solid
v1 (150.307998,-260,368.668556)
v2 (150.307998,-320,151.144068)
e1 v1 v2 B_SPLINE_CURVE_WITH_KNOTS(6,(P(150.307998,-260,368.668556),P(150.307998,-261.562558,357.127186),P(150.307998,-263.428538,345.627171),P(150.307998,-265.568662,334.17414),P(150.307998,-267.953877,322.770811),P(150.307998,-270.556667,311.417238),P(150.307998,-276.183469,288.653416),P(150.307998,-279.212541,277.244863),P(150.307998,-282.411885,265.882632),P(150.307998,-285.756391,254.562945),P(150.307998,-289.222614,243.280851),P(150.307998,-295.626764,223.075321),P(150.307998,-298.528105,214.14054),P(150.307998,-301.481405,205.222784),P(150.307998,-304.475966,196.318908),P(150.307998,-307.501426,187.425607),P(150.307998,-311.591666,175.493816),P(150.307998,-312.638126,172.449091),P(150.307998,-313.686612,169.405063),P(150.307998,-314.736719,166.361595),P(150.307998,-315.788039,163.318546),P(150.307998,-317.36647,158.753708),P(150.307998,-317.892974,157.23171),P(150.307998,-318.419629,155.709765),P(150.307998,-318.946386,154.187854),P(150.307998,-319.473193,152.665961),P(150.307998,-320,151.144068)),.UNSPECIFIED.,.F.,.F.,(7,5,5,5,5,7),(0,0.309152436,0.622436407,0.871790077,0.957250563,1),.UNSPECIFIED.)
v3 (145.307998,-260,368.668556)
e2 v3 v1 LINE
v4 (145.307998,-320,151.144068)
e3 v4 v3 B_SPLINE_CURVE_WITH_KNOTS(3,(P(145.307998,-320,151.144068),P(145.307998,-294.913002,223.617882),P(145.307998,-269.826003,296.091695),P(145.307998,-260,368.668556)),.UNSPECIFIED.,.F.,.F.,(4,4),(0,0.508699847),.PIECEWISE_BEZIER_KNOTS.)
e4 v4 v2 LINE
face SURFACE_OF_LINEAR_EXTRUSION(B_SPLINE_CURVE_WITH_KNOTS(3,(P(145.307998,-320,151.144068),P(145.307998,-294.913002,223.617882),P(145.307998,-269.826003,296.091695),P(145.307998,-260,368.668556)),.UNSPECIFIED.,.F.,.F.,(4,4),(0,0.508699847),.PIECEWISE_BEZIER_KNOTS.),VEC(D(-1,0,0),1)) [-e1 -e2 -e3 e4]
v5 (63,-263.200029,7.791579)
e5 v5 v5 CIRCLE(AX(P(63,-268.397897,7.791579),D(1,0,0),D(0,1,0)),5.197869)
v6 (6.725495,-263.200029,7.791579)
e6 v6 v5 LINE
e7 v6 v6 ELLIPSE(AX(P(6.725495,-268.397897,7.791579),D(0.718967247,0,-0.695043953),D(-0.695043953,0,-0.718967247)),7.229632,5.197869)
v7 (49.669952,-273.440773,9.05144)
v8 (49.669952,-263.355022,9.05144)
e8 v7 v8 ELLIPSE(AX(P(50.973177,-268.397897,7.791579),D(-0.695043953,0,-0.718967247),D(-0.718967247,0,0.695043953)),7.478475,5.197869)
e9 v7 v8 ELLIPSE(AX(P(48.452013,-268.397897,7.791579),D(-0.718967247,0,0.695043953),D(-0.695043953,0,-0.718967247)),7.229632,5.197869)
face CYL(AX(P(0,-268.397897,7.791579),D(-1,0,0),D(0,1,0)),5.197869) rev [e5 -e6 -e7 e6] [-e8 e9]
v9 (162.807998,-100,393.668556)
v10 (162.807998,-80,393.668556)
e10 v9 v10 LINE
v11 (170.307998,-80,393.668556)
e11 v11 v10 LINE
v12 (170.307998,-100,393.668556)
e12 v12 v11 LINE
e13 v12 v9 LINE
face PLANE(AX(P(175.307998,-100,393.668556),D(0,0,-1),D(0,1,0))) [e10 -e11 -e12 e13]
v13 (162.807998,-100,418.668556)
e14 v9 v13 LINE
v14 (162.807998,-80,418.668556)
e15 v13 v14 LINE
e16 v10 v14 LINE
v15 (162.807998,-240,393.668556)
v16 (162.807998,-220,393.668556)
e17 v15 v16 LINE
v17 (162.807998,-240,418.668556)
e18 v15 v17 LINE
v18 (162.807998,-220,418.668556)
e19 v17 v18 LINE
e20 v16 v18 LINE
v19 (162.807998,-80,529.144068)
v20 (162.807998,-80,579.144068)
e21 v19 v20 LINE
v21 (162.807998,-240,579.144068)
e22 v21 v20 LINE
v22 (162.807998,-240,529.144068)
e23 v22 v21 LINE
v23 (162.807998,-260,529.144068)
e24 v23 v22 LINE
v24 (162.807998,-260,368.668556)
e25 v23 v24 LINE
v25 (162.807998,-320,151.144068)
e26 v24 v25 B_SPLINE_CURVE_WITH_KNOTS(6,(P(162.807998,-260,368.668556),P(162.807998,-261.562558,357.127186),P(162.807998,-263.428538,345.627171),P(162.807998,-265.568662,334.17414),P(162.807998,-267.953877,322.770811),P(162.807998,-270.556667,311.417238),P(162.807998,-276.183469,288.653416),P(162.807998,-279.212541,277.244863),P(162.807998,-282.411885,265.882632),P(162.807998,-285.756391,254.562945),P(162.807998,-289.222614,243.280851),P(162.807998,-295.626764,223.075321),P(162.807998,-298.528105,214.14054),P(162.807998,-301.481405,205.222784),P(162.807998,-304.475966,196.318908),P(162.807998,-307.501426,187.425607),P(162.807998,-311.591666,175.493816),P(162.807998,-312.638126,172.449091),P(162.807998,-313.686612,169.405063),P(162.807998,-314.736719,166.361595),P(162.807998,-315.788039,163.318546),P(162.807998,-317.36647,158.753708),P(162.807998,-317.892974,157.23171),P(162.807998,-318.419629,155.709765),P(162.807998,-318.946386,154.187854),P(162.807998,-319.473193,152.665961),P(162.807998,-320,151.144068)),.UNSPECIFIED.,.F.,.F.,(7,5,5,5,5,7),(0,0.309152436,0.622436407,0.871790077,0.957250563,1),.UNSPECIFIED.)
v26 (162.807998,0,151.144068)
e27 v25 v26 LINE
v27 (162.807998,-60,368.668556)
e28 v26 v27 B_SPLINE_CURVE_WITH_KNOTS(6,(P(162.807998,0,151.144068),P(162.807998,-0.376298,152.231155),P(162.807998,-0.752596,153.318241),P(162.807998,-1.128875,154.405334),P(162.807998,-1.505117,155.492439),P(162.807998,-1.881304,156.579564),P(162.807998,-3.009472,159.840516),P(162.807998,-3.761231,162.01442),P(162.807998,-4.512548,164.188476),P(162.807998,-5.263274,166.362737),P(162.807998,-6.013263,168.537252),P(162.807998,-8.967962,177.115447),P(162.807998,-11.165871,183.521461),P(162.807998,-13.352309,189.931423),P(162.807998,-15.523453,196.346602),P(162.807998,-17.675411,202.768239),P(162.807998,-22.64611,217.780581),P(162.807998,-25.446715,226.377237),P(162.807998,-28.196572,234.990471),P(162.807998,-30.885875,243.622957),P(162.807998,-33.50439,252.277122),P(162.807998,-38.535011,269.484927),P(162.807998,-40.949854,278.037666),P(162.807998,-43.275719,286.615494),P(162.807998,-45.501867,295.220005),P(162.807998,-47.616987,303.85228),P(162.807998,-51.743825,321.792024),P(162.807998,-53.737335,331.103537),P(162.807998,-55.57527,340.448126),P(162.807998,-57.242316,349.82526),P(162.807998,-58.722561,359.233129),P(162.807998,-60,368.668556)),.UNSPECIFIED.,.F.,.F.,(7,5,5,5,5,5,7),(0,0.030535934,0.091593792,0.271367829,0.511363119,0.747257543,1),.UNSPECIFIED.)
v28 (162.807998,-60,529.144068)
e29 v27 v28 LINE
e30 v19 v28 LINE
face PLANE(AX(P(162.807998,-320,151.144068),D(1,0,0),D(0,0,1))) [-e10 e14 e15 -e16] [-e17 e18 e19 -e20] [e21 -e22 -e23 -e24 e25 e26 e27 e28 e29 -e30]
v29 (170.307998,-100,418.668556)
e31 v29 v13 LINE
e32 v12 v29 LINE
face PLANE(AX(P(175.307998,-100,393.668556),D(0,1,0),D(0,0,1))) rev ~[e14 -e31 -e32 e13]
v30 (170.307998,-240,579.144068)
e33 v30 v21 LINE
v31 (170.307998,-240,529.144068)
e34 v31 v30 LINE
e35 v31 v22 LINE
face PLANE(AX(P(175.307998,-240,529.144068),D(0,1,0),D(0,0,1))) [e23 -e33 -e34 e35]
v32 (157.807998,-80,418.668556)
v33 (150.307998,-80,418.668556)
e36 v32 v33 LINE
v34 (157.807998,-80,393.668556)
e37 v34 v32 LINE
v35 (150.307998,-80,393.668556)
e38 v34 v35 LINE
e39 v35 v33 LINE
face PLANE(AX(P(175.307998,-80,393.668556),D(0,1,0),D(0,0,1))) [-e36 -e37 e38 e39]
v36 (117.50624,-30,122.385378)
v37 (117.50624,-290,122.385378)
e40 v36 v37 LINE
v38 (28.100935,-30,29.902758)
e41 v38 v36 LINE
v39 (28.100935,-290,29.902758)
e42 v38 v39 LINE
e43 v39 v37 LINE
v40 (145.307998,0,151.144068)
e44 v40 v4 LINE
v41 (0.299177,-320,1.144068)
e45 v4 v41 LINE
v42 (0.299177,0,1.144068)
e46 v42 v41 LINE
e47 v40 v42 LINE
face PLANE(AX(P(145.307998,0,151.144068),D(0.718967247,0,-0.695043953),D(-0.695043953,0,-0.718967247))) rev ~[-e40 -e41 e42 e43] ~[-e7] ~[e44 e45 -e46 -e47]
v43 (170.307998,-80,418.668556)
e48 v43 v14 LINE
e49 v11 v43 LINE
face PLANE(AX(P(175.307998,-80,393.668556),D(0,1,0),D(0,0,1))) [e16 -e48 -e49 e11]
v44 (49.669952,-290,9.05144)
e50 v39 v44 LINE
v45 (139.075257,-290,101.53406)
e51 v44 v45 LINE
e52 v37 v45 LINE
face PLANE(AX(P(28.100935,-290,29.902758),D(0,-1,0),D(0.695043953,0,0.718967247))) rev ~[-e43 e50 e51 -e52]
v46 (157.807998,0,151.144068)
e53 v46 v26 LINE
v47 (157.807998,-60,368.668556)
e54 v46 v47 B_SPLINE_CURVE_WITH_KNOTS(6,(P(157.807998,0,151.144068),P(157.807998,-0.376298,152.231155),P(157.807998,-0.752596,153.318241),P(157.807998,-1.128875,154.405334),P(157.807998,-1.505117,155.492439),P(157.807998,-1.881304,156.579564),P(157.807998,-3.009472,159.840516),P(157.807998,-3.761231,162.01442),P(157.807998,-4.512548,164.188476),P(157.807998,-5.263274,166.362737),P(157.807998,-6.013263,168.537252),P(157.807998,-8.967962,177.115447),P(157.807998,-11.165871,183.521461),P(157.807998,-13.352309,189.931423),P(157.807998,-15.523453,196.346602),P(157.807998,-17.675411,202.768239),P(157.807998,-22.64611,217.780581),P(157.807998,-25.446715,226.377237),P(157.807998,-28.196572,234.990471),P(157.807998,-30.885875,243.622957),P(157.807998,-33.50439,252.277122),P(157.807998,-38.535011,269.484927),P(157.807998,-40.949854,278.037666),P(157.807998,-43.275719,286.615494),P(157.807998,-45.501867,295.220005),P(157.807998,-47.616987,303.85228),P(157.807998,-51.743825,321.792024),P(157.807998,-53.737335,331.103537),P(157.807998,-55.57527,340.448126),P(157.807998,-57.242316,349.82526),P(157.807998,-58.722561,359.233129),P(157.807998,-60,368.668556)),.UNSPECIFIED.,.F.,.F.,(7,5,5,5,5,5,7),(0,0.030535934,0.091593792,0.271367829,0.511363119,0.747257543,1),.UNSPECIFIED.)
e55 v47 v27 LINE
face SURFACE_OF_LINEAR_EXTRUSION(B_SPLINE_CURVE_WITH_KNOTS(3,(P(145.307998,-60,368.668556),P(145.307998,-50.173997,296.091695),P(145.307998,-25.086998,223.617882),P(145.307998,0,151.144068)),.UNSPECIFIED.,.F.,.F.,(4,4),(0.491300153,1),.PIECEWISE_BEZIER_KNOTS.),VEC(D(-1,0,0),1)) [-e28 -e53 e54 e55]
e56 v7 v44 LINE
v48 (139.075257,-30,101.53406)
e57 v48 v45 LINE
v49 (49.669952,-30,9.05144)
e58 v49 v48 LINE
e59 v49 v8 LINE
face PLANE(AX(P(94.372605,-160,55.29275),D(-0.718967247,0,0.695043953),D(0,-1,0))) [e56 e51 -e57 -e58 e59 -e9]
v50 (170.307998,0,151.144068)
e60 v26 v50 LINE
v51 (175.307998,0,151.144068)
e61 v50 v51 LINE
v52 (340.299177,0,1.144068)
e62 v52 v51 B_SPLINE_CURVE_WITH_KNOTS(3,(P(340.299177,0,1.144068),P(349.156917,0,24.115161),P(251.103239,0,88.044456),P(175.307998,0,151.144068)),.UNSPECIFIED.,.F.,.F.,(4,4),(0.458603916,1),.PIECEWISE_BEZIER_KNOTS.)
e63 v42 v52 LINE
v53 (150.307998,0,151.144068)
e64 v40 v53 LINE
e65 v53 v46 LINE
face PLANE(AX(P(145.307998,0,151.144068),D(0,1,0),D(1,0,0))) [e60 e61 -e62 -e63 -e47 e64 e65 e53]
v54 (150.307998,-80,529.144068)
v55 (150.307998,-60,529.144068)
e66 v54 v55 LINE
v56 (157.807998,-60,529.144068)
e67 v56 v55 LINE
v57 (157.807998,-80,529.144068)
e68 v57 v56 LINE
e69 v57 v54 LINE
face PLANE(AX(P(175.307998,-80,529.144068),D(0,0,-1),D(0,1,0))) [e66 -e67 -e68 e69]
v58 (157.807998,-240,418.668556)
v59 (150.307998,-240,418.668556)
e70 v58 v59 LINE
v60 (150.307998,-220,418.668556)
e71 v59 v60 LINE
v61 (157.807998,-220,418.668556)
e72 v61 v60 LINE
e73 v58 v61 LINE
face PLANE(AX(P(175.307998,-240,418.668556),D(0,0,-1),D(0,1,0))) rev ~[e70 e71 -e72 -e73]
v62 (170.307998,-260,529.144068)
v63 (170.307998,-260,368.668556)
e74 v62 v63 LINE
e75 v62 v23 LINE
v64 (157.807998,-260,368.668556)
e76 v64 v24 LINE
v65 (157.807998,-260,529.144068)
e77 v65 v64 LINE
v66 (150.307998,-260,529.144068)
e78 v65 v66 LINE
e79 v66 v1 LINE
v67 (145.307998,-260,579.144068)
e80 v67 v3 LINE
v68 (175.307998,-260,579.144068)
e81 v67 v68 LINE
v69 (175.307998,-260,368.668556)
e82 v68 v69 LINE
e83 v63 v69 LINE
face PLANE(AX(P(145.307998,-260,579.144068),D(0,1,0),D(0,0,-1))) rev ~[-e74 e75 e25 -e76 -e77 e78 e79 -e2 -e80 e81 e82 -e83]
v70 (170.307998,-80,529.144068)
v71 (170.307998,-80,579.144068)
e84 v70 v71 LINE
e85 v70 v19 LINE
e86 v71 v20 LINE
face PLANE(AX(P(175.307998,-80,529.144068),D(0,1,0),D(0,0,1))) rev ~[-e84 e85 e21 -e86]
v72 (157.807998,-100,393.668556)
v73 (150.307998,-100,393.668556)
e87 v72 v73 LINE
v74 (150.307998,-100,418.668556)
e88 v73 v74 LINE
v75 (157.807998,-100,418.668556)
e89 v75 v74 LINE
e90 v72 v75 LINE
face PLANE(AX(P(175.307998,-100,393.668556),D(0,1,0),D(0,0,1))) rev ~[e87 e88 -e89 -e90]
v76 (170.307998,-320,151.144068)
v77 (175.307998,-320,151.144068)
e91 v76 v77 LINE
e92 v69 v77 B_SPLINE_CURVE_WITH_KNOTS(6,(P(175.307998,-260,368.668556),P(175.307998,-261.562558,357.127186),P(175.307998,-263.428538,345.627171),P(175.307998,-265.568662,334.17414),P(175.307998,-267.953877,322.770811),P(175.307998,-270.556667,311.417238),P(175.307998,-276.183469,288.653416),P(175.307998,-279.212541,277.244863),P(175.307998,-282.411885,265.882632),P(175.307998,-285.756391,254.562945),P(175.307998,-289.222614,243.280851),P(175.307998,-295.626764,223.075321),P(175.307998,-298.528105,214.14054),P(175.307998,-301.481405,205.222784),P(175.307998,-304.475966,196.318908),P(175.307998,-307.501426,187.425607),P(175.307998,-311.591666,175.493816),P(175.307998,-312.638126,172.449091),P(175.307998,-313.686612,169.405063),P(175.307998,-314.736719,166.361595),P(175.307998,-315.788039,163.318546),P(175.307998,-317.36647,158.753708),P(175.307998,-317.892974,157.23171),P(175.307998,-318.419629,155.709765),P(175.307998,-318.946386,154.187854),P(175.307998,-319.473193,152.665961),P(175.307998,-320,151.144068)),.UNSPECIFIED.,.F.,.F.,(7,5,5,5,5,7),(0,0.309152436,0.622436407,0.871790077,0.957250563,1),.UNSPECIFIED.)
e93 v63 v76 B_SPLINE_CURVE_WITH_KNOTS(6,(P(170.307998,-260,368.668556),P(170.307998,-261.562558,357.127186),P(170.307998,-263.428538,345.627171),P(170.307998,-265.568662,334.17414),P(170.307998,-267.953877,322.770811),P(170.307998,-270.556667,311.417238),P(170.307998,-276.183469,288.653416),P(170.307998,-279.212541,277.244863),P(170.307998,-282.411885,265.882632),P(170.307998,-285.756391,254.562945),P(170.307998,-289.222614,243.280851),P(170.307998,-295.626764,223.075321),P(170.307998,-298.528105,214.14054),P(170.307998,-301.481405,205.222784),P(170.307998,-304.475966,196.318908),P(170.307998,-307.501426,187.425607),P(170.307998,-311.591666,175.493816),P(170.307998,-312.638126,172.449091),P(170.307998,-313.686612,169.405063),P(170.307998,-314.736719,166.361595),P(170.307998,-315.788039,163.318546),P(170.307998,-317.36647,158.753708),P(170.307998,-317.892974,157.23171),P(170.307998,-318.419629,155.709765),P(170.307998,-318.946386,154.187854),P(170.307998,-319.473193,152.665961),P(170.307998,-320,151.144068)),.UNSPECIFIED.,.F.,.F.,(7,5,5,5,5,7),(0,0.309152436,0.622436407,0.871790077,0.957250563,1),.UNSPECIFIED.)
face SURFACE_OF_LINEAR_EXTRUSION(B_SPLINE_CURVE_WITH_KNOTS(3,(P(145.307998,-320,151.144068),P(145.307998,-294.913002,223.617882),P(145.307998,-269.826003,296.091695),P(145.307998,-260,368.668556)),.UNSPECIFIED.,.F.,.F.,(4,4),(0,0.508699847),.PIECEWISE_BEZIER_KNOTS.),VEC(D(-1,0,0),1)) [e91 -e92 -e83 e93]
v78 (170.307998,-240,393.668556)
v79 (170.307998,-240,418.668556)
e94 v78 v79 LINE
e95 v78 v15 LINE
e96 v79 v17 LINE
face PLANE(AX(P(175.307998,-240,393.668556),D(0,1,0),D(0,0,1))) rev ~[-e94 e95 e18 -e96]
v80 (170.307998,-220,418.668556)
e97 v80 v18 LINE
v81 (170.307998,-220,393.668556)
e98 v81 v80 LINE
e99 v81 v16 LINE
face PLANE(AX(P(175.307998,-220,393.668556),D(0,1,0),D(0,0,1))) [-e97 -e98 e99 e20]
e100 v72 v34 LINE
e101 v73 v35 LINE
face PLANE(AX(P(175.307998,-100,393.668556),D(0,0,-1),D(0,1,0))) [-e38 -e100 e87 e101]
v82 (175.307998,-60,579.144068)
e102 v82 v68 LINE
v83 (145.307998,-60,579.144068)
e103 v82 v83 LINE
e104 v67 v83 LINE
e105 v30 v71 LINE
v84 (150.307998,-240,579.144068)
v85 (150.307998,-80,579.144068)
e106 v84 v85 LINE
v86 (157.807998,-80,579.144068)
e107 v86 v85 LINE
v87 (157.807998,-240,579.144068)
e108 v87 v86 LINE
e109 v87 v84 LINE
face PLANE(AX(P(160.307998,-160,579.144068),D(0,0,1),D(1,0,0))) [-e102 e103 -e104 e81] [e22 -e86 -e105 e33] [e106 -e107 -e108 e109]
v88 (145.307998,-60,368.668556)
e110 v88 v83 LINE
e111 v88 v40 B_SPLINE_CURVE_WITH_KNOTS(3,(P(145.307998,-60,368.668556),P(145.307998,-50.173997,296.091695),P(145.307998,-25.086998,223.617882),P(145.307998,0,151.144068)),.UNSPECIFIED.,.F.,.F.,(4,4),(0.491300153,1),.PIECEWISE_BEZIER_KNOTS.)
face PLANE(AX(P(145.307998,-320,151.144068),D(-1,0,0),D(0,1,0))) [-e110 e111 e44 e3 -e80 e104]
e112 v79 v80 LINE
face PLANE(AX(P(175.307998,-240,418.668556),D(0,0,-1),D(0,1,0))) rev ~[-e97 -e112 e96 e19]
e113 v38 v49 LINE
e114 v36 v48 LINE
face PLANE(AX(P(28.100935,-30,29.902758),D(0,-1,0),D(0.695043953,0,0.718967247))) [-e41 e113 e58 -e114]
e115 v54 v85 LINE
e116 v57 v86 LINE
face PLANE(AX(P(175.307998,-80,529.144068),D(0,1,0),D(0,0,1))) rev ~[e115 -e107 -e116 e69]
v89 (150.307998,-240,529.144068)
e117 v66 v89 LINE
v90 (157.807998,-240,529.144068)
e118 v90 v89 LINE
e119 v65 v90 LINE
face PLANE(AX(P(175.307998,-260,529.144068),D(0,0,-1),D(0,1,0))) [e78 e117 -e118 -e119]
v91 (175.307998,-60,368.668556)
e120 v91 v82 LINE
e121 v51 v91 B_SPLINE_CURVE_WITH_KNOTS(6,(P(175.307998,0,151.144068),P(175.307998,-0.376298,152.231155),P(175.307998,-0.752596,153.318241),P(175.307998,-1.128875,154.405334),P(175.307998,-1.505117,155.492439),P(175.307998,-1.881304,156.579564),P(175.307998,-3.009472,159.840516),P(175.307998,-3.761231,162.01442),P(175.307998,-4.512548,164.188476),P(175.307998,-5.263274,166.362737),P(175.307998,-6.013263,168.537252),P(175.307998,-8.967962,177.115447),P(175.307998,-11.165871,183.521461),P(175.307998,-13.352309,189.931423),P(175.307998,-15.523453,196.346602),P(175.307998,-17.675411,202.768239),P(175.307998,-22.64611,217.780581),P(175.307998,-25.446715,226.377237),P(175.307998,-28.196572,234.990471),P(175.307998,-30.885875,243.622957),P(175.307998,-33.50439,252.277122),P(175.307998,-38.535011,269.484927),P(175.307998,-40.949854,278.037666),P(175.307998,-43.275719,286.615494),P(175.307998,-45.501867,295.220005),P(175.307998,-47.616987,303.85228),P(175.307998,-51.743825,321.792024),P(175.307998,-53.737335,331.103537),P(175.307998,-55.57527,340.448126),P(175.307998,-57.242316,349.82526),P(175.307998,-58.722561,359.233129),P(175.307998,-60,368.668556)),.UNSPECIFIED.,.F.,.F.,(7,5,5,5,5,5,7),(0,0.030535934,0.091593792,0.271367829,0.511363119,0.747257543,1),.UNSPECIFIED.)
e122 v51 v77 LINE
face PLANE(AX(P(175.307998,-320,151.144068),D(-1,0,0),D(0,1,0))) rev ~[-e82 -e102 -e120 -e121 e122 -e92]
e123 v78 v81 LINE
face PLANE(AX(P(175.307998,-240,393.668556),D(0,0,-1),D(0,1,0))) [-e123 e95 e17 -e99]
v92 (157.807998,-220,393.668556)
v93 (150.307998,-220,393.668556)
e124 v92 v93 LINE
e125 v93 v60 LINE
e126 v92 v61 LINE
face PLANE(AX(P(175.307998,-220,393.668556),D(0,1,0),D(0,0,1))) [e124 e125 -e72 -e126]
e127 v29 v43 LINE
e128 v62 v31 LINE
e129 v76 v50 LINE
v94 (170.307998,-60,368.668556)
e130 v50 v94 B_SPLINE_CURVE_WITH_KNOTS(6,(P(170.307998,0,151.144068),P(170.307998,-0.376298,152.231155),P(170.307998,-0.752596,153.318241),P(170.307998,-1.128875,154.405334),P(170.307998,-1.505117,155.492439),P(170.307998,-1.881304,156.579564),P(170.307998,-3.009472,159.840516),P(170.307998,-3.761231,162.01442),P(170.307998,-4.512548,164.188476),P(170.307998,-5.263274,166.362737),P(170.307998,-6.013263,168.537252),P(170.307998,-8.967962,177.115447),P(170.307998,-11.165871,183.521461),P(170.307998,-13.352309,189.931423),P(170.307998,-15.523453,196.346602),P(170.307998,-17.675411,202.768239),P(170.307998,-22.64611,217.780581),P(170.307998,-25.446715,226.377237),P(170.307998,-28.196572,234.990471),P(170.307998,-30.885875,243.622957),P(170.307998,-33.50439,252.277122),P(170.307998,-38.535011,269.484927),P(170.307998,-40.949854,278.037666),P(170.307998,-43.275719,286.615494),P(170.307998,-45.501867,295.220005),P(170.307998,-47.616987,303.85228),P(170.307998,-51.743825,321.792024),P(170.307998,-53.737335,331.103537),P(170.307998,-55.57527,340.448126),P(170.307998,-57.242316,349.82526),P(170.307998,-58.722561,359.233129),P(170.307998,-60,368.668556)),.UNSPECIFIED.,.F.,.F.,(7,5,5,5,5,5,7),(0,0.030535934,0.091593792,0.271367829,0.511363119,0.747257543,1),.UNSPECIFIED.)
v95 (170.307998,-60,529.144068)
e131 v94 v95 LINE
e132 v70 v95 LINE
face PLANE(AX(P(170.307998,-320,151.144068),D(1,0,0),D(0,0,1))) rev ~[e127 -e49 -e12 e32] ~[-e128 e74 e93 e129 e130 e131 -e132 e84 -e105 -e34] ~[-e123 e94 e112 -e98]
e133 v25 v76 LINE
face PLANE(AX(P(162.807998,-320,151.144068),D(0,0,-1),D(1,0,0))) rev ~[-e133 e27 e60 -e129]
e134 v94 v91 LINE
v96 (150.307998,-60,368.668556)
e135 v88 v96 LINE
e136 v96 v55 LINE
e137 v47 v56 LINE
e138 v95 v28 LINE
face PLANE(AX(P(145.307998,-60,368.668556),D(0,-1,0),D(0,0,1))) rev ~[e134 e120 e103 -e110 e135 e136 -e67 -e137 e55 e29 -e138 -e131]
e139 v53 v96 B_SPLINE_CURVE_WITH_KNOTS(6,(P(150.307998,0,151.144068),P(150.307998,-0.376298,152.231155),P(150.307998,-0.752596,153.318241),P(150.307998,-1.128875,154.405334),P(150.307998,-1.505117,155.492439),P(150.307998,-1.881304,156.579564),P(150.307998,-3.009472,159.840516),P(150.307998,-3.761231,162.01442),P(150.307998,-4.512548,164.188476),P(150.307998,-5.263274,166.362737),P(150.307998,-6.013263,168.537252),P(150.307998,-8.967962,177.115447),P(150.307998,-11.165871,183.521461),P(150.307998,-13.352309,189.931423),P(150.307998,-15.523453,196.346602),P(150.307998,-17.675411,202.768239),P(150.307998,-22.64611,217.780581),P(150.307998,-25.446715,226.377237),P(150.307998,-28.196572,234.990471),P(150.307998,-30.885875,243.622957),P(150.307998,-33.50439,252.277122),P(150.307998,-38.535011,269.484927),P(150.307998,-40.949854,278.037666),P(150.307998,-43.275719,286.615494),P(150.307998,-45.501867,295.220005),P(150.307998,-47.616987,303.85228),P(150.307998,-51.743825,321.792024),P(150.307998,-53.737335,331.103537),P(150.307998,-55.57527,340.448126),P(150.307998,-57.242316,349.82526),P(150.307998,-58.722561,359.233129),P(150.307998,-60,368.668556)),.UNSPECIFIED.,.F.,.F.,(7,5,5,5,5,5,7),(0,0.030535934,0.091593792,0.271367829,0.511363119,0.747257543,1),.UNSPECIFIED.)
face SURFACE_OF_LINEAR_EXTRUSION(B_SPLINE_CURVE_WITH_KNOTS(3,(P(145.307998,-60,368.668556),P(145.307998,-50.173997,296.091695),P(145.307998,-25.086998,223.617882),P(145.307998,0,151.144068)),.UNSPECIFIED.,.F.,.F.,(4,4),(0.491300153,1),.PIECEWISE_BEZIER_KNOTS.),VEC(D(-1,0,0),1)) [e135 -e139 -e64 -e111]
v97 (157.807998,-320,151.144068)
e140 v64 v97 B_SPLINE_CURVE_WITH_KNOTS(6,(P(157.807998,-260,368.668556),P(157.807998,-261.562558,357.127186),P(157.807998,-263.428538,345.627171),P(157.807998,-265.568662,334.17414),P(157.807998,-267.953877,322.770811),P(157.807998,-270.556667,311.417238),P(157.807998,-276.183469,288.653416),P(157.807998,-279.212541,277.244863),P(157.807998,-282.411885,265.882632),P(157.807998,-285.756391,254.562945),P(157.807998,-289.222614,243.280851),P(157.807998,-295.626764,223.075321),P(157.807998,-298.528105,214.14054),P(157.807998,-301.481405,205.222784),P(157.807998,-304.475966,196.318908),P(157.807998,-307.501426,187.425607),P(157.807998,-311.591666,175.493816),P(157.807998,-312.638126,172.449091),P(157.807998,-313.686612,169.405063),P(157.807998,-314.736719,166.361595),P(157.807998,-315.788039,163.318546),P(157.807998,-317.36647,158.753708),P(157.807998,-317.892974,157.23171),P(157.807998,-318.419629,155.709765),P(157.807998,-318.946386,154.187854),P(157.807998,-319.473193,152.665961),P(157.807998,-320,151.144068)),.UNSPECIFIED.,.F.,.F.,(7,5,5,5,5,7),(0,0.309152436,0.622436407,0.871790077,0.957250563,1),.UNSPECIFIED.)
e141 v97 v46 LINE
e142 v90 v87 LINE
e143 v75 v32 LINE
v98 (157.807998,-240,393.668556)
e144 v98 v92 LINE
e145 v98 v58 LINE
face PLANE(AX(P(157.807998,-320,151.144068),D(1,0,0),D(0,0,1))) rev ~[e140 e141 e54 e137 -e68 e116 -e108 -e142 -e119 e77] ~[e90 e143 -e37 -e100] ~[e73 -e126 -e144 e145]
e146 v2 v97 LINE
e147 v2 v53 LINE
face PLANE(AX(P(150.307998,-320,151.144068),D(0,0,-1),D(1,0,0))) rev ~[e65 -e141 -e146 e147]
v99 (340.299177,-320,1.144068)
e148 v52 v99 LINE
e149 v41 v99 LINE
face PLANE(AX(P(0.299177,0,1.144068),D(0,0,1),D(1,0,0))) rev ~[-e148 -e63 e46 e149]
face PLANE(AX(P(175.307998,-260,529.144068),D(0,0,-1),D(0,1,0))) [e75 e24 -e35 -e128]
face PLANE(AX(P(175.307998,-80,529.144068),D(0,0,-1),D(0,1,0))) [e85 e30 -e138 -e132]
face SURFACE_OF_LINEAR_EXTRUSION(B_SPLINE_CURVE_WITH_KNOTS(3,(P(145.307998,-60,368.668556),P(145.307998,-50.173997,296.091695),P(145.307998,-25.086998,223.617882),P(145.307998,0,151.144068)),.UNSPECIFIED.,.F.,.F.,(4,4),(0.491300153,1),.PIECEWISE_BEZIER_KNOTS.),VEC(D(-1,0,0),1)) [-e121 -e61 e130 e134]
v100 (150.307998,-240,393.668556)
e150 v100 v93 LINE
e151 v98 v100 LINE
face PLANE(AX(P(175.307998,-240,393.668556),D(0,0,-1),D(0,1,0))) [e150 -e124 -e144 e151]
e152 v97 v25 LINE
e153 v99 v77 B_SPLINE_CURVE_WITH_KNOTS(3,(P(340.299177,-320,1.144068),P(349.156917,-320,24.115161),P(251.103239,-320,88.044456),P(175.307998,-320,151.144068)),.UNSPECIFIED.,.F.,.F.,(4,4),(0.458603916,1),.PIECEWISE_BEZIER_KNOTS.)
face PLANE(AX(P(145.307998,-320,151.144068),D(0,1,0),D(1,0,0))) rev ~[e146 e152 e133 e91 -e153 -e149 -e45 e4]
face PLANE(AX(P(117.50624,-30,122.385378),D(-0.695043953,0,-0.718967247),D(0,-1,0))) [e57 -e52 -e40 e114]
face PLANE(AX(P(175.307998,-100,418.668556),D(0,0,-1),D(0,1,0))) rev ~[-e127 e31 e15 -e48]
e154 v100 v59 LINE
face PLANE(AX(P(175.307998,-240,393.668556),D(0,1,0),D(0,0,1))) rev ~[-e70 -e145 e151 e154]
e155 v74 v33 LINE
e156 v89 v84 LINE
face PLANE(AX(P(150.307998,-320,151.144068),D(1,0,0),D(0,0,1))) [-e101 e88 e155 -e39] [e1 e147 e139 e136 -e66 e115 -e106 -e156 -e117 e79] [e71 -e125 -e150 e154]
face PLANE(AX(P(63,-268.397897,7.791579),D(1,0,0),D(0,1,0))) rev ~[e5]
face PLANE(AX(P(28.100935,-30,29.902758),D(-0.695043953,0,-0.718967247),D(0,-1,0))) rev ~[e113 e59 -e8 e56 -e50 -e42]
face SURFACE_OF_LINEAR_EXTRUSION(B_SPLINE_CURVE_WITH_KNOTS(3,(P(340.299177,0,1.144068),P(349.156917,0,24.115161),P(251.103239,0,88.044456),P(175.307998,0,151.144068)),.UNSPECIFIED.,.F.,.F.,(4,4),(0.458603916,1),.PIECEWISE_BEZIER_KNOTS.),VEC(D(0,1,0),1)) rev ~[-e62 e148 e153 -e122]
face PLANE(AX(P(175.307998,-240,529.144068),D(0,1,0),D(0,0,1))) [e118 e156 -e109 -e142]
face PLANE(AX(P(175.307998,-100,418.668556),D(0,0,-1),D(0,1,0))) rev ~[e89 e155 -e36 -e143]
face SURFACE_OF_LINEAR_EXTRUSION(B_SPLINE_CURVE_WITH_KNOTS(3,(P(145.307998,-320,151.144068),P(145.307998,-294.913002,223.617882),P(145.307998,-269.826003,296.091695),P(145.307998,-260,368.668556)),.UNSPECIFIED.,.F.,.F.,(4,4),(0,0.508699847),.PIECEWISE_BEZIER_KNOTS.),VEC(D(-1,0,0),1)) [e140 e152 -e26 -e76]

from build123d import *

# Parameters (mm, degrees)
F1_DEPTH  = 320
F2_W      = 30
F2_H      = 320
F3_DEPTH  = 428
F5_DEPTH  = 205
F7_W      = 260
F7_H      = 128.6325914682
F8_DEPTH  = 30
F9_W      = 7.5
F9_H      = 457.219858036
F10_DEPTH = 977
F6_W      = 20
F6_H      = 50
F6_H_2    = 25
F11_DEPTH = 25
F12_R     = 5.1978686685
F13_DEPTH = 63


with BuildPart() as f1:
    # F0 (on Front) → F1 (new body)
    with BuildSketch(Plane.XZ):
        with BuildLine():
            Line((150.299176857, 1.1440683747), (180.299176857, 1.1440683747))
            Line((180.299176857, 1.1440683747), (340.299176857, 1.1440683747))
            add(Edge.make_bspline(
                [(340.299176857, 1.1440683747), (349.1569172885, 24.1151609846), (251.1032390966, 88.0444564268), (175.3079980464, 151.1440683747)],
                knots=[0.4586039165, 0.4586039165, 0.4586039165, 0.4586039165, 1, 1, 1, 1], degree=3))
            Line((175.3079980464, 151.1440683747), (145.3079980464, 151.1440683747))
            Line((145.3079980464, 151.1440683747), (0.299176857, 1.1440683747))
            Line((0.299176857, 1.1440683747), (100.299176857, 1.1440683747))
            Line((100.299176857, 1.1440683747), (150.299176857, 1.1440683747))
        make_face()
    extrude(amount=F1_DEPTH)

    # F2 (on face) → F3 (join)
    with BuildSketch(Plane.XY.offset(151.1440683747)):
        with Locations((160.3079980464, -160)):
            Rectangle(F2_W, F2_H)
    extrude(amount=F3_DEPTH)

    # F4 (on face) → F5 (cut)
    with BuildSketch(Plane(origin=(145.3079980464, 0, 0), x_dir=(0, -1, 0), z_dir=(-1, 0, 0))):
        with BuildLine():
            Line((0, 579.1440683747), (0, 151.1440683747))
            add(Edge.make_bspline(
                [(60, 368.6685562134), (50.1739969339, 296.0916949665), (25.086998467, 223.6178816706), (0, 151.1440683747)],
                knots=[0.4913001533, 0.4913001533, 0.4913001533, 0.4913001533, 1, 1, 1, 1], degree=3))
            Line((60, 368.6685562134), (60, 579.1440683747))
            Line((60, 579.1440683747), (0, 579.1440683747))
        make_face()
        with BuildLine():
            add(Edge.make_bspline(
                [(320, 151.1440683747), (294.913001533, 223.6178816706), (269.8260030661, 296.0916949665), (260, 368.6685562134)],
                knots=[0, 0, 0, 0, 0.5086998467, 0.5086998467, 0.5086998467, 0.5086998467], degree=3))
            Line((320, 151.1440683747), (320, 579.1440683747))
            Line((320, 579.1440683747), (260, 579.1440683747))
            Line((260, 579.1440683747), (260, 368.6685562134))
        make_face()
    extrude(amount=-F5_DEPTH, mode=Mode.SUBTRACT)

    # F7 (on face) → F8 (cut)
    with BuildSketch(Plane(origin=(-0.4170581217, 0, 0.4031807106), x_dir=(0, -1, 0), z_dir=(-0.7189672474, 0, 0.6950439534))):
        with Locations((160, 105.3467844897)):
            Rectangle(F7_W, F7_H)
    extrude(amount=-F8_DEPTH, mode=Mode.SUBTRACT)

    # F9 (on face) → F10 (cut)
    with BuildSketch(Plane.XZ.offset(320)):
        with Locations((154.0579980464, 379.7539973927)):
            Rectangle(F9_W, F9_H)
        with Locations((166.5579980464, 379.7539973927)):
            Rectangle(F9_W, F9_H)
    extrude(amount=-F10_DEPTH, mode=Mode.SUBTRACT)

    # F6 (on face) → F11 (join)
    with BuildSketch(Plane.YZ.offset(175.3079980464)):
        with Locations((-250, 554.1440683747)):
            Rectangle(F6_W, F6_H)
        with Locations((-70, 554.1440683747)):
            Rectangle(F6_W, F6_H)
        with Locations((-230, 406.1685562134)):
            Rectangle(F6_W, F6_H_2)
        with Locations((-90, 406.1685562134)):
            Rectangle(F6_W, F6_H_2)
    extrude(amount=-F11_DEPTH)

    # F12 (on Right) → F13 (cut)
    with BuildSketch(Plane.YZ):
        with Locations((-268.3978974819, 7.7915792353)):
            Circle(F12_R)
    extrude(amount=F13_DEPTH, mode=Mode.SUBTRACT)


solid = f1.part
